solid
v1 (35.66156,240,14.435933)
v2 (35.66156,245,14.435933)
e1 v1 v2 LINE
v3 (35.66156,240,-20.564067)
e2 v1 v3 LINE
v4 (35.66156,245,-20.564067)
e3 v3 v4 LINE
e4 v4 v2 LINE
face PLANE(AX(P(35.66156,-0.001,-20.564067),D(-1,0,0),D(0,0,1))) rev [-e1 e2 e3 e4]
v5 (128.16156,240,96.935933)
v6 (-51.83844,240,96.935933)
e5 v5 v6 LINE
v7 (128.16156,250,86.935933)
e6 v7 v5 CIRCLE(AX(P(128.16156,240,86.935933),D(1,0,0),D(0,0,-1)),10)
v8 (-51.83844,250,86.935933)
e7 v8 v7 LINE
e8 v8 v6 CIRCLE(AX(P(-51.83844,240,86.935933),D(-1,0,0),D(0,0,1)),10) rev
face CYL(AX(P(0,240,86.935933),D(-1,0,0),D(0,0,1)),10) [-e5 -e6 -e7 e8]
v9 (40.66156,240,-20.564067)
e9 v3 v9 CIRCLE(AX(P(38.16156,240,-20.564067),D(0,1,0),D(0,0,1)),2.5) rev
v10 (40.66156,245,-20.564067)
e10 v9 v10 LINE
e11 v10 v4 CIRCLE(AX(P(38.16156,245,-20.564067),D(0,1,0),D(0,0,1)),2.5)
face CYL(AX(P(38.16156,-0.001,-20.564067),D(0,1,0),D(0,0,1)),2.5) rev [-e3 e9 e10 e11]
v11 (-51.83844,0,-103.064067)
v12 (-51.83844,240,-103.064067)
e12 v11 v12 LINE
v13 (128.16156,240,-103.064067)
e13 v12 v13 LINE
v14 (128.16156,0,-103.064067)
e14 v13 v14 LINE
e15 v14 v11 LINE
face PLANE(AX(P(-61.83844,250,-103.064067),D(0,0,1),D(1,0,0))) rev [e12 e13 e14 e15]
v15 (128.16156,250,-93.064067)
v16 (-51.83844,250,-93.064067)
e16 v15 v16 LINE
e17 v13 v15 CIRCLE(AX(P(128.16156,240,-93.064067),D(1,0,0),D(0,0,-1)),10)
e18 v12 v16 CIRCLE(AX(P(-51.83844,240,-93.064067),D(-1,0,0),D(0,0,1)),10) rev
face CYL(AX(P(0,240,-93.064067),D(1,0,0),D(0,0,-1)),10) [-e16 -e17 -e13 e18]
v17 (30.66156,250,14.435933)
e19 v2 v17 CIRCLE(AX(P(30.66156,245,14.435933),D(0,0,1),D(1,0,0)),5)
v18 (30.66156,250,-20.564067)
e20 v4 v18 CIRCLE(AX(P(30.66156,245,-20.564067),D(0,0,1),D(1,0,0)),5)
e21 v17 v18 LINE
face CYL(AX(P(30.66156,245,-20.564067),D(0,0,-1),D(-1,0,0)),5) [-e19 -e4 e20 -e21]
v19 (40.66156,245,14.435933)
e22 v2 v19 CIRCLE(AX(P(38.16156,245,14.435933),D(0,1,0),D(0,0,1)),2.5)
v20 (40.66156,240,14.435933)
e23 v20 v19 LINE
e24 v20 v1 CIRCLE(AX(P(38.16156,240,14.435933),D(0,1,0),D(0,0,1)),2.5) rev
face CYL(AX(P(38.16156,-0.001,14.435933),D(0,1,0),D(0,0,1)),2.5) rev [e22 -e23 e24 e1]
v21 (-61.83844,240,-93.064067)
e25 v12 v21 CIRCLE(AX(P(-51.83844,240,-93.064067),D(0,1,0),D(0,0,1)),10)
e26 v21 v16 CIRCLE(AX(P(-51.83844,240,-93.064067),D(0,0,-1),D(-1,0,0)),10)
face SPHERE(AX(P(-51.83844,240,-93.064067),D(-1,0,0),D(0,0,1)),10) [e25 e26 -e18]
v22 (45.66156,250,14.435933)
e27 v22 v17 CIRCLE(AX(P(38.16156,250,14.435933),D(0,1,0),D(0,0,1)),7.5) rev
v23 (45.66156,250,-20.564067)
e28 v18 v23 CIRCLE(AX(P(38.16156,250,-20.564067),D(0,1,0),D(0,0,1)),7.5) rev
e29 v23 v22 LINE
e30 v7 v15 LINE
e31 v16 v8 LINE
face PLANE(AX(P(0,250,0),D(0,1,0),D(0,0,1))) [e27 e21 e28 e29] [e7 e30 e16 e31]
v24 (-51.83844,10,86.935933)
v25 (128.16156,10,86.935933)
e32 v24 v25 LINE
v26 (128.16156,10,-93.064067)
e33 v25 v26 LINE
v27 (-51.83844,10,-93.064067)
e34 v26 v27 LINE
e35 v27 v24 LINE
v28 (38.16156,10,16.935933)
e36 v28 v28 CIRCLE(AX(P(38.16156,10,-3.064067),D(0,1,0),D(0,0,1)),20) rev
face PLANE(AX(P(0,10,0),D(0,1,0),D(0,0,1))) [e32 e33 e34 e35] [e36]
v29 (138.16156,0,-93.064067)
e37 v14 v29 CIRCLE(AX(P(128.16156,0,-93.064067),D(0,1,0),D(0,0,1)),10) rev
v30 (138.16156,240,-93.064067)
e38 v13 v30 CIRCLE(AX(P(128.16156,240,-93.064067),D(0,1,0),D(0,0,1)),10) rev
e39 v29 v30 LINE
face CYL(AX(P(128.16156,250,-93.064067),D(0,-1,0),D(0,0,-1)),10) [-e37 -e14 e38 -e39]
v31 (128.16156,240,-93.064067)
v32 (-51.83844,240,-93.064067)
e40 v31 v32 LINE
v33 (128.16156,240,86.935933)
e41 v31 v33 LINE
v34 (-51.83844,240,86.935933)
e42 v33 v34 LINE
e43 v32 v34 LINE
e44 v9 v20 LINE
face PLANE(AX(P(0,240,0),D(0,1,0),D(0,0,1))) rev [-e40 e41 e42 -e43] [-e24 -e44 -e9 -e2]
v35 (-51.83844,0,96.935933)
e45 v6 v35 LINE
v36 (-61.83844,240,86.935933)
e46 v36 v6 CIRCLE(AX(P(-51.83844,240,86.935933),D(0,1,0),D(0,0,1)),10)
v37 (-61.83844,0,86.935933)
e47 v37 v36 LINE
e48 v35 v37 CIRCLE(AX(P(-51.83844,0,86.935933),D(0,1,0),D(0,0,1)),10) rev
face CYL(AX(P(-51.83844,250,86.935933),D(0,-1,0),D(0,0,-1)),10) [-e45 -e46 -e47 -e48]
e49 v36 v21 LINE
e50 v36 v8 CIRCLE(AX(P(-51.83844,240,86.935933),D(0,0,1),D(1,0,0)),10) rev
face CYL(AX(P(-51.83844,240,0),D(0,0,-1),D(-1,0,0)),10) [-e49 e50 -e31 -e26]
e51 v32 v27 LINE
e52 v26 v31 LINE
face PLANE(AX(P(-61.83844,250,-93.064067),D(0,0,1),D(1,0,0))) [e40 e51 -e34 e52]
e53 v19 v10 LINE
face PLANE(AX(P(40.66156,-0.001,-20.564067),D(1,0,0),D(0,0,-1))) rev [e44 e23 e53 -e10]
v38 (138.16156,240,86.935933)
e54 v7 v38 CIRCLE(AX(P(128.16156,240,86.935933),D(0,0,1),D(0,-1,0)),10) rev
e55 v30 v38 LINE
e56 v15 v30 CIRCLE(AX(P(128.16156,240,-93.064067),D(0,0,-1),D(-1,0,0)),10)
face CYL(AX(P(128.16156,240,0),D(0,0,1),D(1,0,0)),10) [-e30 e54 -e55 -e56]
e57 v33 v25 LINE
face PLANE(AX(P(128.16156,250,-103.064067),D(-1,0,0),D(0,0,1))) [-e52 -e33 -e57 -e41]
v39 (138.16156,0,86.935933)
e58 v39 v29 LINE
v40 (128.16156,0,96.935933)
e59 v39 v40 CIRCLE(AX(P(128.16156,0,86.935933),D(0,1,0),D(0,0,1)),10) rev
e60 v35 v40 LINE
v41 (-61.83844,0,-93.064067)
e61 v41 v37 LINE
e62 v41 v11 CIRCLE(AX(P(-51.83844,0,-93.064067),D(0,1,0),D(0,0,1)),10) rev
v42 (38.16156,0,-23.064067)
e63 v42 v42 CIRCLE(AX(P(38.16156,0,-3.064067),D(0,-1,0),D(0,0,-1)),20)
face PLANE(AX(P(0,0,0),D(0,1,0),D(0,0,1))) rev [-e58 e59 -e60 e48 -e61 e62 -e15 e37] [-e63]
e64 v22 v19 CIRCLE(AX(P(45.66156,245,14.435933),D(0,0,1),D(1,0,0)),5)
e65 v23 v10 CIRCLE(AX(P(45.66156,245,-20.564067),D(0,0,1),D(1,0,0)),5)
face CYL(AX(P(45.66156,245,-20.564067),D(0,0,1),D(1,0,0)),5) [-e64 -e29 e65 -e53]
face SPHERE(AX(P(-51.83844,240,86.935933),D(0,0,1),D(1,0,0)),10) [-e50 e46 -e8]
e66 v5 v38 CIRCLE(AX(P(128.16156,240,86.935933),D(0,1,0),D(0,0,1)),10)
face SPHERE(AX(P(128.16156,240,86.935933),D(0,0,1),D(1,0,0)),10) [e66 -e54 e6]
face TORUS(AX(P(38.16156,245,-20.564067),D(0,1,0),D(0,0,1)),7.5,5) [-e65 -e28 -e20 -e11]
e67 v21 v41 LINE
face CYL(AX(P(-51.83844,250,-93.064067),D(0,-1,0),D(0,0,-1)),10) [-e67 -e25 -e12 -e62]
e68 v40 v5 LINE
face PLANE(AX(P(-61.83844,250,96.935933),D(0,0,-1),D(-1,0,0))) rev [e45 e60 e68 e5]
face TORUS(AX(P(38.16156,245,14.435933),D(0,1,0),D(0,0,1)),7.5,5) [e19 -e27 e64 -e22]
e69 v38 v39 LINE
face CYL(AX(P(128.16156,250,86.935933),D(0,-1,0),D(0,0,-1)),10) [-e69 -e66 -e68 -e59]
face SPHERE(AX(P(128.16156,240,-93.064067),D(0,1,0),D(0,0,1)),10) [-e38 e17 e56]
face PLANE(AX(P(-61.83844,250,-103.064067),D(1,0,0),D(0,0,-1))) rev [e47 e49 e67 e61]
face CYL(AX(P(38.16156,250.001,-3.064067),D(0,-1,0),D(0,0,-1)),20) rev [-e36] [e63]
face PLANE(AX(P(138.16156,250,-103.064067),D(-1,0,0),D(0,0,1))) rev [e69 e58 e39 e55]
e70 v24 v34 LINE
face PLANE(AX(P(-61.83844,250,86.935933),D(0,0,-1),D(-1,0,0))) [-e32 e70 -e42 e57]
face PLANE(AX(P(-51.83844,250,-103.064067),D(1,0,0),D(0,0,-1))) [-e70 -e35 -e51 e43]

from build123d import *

# Parameters (mm, degrees)
SKETCH1_W           = 200
SKETCH1_H           = 200
BOSS_EXTRUDE1_DEPTH = 250
FILLET1_R           = 10
SHELL1_START        = -51.838440111
SHELL1_OUTLINE_W    = 230
SHELL1_OUTLINE_H    = 180
SHELL1_DEPTH        = 180
CUT_EXTRUDE1_REACH  = 305.662
FILLET2_R           = 5
CUT_EXTRUDE2_REACH  = 305.662
SKETCH3_R           = 20


# Read off the part's stored shape, not the designer's step: Shell1
with BuildPart() as part:
    # Sketch1 → Boss-Extrude1 (new body)
    with BuildSketch(Plane(origin=(0, 0, 0), x_dir=(1, 0, 0), z_dir=(0, 1, 0))):
        with Locations((38.161559889, 3.064066852)):
            Rectangle(SKETCH1_W, SKETCH1_H)
    extrude(amount=BOSS_EXTRUDE1_DEPTH)

    # Fillet1
    fillet1_edges = [part.edges().sort_by_distance(p)[0] for p in [
        (138.161559889, 250, -3.064066852),
        (38.161559889, 250, -103.064066852),
        (-61.838440111, 250, -3.064066852),
        (-61.838440111, 125, -103.064066852),
        (138.161559889, 125, -103.064066852),
        (138.161559889, 125, 96.935933148),
        (-61.838440111, 125, 96.935933148),
        (38.161559889, 250, 96.935933148),
    ]]
    fillet(fillet1_edges, radius=FILLET1_R)

    # Shell1 outline → Shell1 (cut)
    with BuildSketch(Plane.YZ.offset(SHELL1_START)):
        with Locations((125, -3.064066852)):
            Rectangle(SHELL1_OUTLINE_W, SHELL1_OUTLINE_H)
    extrude(amount=SHELL1_DEPTH, mode=Mode.SUBTRACT)

    # Sketch2 → Cut-Extrude1 (cut, up to next)
    with BuildSketch(Plane(origin=(0, 250, 0), x_dir=(1, 0, 0), z_dir=(0, 1, 0)), mode=Mode.PRIVATE) as cut_extrude1_sk1:
        with BuildLine():
            Line((40.661559889, 20.564066852), (40.661559889, -14.435933148))
            ThreePointArc((40.661559889, -14.435933148), (38.161559889, -16.935933148), (35.661559889, -14.435933148))
            Line((35.661559889, -14.435933148), (35.661559889, 20.564066852))
            ThreePointArc((35.661559889, 20.564066852), (38.161559889, 23.064066852), (40.661559889, 20.564066852))
        make_face()
    cut_extrude1_tool1 = extrude(cut_extrude1_sk1.sketch, amount=-CUT_EXTRUDE1_REACH, mode=Mode.PRIVATE) & part.part
    add(cut_extrude1_tool1.solids().sort_by_distance((38.16156, 250, -3.064067))[0], mode=Mode.SUBTRACT)

    # Fillet2
    fillet2_edges = [part.edges().sort_by_distance(p)[0] for p in [
        (38.161559889, 250, -23.064066852),
        (35.661559889, 250, -3.064066852),
        (38.161559889, 250, 16.935933148),
        (40.661559889, 250, -3.064066852),
    ]]
    fillet(fillet2_edges, radius=FILLET2_R)

    # Sketch3 → Cut-Extrude2 (cut, up to next)
    with BuildSketch(Plane(origin=(0, 0, 0), x_dir=(-1, 0, 0), z_dir=(0, -1, 0)), mode=Mode.PRIVATE) as cut_extrude2_sk1:
        with Locations(Location((-38.161559889, 3.064066852, 0), (0, 0, 90))):
            Circle(SKETCH3_R)
    cut_extrude2_tool1 = extrude(cut_extrude2_sk1.sketch, amount=-CUT_EXTRUDE2_REACH, mode=Mode.PRIVATE) & part.part
    add(cut_extrude2_tool1.solids().sort_by_distance((38.16156, 0, -3.064067))[0], mode=Mode.SUBTRACT)


solid = part.part
